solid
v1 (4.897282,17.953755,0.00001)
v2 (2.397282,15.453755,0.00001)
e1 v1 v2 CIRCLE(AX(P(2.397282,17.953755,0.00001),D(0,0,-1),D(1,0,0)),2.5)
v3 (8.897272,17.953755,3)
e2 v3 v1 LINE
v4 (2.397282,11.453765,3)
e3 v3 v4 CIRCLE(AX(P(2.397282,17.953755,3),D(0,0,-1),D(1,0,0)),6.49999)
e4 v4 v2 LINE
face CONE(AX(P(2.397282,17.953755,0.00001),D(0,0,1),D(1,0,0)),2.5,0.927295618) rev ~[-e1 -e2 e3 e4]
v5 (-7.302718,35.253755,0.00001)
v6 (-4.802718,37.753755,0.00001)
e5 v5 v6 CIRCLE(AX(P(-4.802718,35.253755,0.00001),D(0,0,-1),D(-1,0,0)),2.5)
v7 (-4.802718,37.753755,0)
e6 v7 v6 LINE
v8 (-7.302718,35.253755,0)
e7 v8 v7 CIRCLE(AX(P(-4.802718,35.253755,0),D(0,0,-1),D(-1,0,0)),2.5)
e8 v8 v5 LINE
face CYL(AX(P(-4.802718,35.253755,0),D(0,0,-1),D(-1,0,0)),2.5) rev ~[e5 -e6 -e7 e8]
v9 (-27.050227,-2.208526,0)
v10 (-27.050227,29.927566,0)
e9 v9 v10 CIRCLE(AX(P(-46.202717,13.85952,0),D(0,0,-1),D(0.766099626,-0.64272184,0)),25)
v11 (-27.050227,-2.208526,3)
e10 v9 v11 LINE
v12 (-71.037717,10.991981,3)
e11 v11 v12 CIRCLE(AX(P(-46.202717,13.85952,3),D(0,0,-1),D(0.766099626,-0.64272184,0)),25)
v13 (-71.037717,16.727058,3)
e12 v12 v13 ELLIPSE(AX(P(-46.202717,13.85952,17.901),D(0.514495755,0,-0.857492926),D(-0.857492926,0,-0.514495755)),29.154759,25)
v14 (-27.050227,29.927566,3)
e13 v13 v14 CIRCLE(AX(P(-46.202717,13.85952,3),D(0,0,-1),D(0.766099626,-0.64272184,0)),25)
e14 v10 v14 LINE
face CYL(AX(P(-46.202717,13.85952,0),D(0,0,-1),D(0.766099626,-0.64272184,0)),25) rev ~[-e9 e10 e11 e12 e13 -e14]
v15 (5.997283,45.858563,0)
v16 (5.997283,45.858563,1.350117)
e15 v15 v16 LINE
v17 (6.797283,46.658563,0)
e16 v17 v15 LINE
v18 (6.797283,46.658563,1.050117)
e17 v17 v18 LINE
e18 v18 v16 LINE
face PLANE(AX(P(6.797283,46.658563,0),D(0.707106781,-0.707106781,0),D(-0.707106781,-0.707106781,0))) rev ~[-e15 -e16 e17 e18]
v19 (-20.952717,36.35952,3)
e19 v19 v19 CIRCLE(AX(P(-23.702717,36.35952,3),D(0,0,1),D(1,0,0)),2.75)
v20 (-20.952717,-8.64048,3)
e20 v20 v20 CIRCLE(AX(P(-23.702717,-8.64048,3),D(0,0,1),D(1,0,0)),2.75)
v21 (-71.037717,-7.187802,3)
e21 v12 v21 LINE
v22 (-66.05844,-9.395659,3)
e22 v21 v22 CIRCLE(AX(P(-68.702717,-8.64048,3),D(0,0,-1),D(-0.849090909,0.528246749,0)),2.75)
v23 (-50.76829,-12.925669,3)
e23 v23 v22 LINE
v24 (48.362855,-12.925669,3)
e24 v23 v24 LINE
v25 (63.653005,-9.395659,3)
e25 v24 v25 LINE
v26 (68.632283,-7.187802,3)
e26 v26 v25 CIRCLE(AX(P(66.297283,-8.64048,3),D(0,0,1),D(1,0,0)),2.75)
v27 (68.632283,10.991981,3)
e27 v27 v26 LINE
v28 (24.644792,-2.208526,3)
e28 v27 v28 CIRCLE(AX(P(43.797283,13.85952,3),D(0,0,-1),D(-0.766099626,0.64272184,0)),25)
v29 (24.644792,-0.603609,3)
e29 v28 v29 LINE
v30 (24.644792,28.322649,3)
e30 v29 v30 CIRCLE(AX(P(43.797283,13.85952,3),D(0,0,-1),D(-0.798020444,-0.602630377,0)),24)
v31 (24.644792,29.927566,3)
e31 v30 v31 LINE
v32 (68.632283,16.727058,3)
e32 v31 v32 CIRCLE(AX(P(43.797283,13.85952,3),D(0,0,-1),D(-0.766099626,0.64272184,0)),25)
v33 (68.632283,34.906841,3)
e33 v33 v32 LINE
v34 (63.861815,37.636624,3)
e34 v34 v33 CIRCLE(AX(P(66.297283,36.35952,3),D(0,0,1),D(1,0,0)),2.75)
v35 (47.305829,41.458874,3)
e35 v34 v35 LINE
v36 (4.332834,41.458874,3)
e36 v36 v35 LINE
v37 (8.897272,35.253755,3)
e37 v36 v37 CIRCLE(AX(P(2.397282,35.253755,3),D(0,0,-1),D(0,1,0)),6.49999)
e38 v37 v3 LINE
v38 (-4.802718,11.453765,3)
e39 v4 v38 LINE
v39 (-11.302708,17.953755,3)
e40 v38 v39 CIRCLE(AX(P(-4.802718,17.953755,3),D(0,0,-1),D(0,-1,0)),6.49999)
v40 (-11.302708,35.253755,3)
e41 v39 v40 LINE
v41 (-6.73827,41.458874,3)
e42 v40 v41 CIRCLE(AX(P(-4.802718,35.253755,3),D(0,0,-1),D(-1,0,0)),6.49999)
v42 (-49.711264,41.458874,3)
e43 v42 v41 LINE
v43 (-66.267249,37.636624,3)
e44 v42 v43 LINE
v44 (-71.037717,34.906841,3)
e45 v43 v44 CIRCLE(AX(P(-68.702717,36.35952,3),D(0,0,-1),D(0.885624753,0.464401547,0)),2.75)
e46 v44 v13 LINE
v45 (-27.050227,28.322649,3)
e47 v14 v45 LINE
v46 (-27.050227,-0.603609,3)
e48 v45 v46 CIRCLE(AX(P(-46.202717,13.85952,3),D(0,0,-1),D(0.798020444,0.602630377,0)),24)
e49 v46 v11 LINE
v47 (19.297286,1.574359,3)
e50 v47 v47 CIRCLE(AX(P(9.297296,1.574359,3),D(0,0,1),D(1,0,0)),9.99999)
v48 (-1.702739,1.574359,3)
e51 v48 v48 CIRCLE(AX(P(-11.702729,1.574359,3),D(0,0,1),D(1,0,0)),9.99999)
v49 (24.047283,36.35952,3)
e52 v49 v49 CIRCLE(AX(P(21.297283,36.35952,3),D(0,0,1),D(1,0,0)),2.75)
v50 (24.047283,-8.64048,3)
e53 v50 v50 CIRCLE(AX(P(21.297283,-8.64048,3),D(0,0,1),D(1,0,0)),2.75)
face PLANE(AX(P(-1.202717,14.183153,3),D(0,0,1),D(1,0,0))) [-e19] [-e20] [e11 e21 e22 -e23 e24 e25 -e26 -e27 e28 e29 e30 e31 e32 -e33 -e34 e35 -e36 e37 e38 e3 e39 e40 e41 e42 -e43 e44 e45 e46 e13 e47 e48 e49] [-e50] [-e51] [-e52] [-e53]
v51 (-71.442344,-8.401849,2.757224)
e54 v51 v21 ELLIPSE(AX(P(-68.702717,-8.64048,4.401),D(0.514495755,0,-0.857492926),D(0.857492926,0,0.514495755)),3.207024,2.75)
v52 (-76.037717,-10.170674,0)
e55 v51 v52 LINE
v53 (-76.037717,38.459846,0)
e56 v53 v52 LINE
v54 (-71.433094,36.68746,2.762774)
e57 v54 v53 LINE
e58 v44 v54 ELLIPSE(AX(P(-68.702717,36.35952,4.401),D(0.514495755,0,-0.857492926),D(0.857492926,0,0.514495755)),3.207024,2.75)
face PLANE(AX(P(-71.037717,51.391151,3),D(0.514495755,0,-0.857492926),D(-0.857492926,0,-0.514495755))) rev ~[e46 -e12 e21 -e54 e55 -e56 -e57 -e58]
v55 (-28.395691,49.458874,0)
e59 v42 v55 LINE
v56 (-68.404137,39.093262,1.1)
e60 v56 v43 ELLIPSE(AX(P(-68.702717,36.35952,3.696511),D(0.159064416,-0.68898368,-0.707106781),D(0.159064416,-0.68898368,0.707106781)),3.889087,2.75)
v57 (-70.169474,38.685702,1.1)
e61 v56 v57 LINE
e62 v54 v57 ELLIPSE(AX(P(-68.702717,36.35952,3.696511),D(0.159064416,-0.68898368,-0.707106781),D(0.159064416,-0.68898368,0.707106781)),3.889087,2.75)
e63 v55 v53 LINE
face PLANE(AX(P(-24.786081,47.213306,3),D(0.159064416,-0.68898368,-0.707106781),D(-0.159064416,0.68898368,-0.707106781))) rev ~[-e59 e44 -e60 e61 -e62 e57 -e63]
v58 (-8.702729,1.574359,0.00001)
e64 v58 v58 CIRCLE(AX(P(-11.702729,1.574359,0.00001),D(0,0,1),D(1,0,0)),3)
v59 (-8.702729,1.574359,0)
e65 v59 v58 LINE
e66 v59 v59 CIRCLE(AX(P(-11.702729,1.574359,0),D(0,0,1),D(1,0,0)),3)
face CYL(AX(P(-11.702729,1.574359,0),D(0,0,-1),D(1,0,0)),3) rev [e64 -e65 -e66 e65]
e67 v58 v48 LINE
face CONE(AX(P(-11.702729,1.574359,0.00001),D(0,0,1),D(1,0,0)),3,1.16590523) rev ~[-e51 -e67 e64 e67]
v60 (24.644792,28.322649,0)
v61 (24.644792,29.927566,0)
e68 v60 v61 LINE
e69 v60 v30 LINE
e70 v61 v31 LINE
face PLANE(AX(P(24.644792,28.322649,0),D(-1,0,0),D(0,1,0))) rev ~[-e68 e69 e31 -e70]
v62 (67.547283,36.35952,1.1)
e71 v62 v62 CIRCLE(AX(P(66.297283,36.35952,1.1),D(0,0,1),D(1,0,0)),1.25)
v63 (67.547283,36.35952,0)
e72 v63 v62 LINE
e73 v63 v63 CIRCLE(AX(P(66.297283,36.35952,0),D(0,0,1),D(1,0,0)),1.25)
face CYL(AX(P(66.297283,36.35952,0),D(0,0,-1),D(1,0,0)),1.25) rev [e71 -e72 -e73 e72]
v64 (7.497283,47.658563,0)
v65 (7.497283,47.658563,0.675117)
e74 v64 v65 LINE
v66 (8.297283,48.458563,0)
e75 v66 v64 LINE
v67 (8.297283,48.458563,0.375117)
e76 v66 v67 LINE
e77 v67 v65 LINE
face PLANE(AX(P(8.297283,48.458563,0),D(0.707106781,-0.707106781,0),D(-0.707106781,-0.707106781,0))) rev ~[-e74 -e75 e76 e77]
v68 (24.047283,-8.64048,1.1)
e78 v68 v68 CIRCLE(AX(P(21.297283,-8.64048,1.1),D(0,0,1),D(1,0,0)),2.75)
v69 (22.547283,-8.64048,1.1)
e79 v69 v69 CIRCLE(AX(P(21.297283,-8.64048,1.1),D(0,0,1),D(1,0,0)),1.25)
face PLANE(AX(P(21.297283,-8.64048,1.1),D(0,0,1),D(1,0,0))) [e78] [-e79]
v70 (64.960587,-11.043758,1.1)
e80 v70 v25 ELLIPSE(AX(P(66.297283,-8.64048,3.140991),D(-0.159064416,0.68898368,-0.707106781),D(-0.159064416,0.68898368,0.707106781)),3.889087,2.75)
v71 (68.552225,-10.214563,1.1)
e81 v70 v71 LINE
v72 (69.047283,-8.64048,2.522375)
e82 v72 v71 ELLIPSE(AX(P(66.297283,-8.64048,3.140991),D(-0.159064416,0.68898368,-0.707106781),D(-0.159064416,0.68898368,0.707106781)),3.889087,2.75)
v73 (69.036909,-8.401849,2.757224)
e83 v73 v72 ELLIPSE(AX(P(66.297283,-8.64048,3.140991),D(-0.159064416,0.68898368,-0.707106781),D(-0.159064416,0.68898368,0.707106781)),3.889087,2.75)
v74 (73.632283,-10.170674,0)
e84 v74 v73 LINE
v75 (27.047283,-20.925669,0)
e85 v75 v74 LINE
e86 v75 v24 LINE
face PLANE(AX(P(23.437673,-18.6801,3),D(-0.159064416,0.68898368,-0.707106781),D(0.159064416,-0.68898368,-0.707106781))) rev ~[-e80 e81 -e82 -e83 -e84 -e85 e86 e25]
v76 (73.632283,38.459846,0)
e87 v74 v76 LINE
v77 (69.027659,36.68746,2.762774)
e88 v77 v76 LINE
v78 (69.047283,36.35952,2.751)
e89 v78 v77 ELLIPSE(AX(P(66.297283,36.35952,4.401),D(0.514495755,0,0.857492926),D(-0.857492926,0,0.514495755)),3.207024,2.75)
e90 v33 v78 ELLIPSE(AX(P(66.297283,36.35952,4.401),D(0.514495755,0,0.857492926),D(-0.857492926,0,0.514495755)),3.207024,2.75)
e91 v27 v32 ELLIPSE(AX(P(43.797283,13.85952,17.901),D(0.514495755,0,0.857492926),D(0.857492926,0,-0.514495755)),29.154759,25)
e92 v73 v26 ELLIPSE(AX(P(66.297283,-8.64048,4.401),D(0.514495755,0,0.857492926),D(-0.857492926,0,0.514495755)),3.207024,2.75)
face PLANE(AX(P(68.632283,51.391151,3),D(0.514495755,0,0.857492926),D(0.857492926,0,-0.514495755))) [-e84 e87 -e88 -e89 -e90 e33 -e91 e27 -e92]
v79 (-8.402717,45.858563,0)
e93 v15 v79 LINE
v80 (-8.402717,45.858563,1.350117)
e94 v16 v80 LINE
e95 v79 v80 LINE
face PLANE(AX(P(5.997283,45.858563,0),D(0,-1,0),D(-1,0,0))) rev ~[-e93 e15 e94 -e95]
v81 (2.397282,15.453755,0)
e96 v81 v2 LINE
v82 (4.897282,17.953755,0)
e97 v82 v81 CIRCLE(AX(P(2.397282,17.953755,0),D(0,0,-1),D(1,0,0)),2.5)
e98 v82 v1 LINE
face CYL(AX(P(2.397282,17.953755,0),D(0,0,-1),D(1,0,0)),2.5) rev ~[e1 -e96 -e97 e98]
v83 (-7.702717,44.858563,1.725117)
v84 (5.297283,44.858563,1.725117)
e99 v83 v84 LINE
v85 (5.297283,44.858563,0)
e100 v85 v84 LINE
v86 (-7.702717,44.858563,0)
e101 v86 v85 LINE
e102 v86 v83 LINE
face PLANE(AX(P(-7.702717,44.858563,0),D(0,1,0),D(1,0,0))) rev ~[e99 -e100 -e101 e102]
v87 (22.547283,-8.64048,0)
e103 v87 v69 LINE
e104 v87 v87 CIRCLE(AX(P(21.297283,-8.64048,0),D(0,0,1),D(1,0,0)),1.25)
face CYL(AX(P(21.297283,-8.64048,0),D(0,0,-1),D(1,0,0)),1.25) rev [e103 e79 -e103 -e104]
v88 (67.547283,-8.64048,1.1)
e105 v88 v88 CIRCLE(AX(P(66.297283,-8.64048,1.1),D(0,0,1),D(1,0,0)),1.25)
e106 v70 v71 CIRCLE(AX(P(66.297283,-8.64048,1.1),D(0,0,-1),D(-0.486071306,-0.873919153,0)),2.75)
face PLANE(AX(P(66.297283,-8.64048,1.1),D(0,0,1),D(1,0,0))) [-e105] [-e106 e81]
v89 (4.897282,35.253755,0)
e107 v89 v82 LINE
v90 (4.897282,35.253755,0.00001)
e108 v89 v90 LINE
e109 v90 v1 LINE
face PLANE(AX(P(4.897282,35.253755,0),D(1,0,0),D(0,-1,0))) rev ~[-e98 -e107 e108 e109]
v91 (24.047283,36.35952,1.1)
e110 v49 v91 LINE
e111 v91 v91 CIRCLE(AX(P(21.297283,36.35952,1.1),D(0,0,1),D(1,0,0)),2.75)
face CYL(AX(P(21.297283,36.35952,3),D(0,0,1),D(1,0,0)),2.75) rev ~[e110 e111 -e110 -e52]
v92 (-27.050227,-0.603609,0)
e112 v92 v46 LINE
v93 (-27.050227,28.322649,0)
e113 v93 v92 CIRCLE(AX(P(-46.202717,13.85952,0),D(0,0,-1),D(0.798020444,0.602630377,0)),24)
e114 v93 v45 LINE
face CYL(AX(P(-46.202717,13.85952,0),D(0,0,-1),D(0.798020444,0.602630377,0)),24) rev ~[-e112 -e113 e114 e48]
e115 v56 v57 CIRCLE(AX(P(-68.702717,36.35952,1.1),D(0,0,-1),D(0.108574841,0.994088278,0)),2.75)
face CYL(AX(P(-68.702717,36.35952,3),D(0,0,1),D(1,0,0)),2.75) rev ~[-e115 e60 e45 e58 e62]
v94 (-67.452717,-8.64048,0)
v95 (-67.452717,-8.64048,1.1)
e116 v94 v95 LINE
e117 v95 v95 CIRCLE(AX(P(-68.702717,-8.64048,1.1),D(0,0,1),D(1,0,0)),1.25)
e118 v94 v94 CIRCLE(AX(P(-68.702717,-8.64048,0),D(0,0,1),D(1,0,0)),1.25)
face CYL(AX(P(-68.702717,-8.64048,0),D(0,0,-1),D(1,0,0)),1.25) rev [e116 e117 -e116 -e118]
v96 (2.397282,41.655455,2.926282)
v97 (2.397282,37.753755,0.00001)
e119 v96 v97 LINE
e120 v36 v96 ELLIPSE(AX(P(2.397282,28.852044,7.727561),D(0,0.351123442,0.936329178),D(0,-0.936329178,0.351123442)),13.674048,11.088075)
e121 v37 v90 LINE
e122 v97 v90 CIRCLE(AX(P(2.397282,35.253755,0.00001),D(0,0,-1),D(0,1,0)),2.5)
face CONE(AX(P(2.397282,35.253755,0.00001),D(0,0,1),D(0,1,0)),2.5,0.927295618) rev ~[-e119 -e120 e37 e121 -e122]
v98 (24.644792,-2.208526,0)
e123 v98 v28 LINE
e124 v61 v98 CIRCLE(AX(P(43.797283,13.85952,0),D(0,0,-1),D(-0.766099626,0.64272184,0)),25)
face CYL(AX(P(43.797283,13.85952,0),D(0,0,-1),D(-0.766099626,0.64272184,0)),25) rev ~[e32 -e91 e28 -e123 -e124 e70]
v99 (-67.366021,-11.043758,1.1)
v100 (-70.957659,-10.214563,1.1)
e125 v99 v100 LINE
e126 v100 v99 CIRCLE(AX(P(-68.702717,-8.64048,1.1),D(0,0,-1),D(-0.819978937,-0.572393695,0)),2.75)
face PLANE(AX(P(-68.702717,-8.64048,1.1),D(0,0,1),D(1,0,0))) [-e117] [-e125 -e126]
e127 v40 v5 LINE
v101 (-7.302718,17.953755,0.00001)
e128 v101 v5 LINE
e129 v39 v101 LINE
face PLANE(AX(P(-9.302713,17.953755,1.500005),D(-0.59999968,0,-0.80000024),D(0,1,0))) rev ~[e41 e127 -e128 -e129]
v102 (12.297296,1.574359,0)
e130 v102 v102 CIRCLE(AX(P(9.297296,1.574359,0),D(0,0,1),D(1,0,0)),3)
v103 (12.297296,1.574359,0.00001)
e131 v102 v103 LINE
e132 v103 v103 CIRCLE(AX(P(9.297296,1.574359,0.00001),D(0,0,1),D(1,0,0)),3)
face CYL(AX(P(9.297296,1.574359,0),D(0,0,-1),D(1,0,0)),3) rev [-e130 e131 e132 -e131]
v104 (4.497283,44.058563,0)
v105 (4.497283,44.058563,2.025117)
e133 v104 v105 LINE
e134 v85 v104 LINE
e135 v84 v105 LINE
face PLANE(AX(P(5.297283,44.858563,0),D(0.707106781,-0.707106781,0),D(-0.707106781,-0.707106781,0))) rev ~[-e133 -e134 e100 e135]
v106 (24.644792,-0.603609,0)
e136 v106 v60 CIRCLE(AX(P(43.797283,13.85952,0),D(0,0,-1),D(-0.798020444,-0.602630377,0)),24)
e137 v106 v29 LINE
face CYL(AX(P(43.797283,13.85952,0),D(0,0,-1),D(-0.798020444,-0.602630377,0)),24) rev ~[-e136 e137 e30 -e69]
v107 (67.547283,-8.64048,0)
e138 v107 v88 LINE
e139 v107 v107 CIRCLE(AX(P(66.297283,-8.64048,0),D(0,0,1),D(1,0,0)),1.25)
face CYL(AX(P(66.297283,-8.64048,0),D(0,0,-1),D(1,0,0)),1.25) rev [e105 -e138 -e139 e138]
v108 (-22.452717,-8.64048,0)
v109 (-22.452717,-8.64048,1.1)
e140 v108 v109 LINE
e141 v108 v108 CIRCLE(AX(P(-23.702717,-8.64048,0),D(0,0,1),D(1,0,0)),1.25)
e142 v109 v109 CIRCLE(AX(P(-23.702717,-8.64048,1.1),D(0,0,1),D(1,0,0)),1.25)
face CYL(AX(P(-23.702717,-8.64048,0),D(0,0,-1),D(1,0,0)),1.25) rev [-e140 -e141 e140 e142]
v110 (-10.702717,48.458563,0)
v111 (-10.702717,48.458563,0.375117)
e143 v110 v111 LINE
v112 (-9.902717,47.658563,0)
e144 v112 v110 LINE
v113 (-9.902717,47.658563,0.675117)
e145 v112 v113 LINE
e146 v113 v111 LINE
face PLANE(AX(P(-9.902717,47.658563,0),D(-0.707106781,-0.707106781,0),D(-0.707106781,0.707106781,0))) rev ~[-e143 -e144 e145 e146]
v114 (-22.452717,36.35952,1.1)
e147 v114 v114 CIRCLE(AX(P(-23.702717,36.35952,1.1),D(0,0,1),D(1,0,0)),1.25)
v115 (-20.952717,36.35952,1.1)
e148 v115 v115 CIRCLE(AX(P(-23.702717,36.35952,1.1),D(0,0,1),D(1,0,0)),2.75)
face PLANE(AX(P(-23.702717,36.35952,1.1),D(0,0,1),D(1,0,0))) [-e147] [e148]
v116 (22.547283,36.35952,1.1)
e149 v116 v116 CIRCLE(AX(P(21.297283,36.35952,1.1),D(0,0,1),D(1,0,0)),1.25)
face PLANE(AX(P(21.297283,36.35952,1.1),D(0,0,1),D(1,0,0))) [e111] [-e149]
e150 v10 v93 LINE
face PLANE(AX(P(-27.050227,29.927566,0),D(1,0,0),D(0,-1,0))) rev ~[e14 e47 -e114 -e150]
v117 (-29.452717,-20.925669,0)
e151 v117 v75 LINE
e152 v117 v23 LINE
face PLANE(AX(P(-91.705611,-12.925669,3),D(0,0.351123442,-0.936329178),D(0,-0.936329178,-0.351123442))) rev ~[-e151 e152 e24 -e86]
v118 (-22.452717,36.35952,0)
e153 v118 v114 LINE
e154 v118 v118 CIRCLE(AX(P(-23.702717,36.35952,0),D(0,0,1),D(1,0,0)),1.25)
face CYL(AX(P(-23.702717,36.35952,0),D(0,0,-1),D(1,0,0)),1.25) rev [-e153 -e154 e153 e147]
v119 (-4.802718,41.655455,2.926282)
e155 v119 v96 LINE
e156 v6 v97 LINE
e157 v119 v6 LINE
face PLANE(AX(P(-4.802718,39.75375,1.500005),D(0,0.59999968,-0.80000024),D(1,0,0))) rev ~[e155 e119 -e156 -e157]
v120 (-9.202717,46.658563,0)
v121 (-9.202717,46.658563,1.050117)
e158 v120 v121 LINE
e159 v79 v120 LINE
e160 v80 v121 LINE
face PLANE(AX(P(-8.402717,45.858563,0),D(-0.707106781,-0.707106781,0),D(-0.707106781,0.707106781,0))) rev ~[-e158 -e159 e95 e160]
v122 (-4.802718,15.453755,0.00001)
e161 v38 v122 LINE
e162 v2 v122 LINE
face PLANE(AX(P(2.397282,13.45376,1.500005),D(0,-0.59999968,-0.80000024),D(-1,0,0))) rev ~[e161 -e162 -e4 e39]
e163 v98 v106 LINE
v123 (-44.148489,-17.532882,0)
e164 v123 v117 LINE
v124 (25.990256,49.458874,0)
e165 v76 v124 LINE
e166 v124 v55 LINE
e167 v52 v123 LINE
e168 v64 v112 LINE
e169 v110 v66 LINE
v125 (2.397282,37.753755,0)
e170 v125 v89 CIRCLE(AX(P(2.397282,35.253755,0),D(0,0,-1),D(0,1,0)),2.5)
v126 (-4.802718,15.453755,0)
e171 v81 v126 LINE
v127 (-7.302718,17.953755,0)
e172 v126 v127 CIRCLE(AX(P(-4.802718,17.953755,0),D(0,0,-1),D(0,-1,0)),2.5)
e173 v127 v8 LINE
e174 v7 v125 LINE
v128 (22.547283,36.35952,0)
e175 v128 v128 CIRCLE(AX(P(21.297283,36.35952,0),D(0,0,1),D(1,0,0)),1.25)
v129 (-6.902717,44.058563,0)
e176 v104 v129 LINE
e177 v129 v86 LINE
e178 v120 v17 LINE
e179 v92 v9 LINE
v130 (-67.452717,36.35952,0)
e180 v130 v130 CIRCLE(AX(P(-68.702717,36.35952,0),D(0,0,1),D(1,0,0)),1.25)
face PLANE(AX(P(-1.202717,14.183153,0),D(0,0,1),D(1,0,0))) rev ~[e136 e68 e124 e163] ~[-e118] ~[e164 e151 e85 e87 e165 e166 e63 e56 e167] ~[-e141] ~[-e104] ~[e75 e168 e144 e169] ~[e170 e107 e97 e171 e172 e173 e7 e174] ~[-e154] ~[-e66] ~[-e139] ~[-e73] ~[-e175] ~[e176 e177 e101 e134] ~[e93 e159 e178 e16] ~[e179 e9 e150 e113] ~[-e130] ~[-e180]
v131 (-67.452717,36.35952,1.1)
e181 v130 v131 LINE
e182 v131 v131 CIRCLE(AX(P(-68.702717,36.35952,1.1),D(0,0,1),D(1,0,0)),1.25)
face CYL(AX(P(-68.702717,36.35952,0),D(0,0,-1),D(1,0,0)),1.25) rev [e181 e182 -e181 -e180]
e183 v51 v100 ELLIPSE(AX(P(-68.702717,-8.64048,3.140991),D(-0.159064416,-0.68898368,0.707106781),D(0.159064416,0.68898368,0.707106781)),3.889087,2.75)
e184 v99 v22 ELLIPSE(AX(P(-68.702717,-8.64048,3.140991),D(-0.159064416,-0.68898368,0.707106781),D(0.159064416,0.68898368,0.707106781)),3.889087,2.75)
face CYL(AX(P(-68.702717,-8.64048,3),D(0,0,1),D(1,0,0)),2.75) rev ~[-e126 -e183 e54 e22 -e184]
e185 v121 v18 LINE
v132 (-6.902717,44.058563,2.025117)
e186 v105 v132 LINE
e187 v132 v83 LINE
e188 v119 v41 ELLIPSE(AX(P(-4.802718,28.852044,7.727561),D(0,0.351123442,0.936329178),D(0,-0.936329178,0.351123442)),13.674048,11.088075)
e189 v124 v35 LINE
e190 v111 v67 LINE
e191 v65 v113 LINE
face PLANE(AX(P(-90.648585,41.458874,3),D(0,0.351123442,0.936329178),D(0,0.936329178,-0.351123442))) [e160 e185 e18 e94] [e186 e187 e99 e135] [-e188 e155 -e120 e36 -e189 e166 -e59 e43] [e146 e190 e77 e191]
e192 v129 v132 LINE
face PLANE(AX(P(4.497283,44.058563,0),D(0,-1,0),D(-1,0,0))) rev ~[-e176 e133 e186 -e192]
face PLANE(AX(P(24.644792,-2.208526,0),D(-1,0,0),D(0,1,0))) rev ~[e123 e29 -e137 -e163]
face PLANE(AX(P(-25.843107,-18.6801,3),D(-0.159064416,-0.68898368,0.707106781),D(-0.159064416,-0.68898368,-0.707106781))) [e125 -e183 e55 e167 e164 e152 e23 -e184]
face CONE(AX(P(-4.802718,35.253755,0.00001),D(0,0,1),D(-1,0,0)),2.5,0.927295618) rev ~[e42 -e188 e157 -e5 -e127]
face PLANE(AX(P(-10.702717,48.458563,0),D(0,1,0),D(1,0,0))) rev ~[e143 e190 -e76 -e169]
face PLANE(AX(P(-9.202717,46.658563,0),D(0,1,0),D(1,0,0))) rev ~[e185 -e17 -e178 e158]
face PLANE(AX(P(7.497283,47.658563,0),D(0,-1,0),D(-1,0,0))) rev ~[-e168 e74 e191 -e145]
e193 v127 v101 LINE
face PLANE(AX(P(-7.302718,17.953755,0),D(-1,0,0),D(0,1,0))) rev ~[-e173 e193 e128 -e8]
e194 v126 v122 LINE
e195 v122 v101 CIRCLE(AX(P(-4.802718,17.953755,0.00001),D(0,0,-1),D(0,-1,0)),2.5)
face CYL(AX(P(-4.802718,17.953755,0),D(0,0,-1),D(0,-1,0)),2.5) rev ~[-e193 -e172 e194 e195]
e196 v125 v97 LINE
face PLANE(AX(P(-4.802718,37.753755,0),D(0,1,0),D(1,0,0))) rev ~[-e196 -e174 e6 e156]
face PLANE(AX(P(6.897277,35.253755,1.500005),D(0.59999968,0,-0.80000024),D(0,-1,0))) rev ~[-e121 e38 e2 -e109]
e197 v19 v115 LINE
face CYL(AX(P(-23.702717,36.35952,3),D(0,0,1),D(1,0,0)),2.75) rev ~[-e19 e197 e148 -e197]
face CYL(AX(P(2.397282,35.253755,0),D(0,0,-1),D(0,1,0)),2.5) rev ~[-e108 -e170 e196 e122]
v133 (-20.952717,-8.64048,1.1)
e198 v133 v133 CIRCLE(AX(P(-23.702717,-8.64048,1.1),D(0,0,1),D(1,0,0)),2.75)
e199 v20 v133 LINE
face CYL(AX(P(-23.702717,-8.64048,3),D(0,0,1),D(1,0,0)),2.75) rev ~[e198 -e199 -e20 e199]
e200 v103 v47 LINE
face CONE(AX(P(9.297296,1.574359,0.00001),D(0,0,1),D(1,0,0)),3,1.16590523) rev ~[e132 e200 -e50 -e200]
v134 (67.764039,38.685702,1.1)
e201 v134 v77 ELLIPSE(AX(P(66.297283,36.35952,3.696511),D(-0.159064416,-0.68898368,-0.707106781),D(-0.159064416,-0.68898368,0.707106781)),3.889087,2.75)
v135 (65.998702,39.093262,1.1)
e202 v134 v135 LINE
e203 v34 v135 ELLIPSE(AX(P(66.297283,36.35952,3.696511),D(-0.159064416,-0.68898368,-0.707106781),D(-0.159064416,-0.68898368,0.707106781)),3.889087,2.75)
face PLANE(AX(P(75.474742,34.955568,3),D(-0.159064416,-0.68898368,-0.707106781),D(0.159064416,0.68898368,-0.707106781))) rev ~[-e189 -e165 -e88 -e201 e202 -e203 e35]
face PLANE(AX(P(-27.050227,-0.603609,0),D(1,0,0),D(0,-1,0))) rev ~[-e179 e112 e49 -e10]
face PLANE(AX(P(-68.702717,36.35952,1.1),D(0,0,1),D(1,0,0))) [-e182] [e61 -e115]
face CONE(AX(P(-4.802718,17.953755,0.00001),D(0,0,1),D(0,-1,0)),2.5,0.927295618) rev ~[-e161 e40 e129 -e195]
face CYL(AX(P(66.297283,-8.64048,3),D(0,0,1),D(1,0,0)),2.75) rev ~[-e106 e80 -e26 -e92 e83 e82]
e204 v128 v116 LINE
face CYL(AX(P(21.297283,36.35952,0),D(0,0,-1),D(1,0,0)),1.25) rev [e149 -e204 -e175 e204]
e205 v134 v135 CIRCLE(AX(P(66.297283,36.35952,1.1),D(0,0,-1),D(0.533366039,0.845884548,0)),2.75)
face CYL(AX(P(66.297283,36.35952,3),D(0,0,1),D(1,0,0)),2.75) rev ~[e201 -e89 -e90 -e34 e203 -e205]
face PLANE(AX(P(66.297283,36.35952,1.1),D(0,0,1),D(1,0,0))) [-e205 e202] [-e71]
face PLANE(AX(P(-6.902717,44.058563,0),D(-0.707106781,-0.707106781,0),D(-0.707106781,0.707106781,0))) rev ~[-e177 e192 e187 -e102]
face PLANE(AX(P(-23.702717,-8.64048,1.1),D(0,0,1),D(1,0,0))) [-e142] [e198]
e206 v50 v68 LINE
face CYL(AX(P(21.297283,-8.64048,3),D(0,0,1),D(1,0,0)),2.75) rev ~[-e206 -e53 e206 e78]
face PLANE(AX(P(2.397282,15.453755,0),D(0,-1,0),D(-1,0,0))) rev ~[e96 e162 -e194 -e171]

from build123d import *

# Parameters (mm, degrees)
F0_R        = 1.25
F0_R_2      = 3
F1_DEPTH    = 3
F2_SIZE2    = 6.99999
F2_SIZE     = 2.99999
F2_2_SIZE2  = 6.99999
F2_2_SIZE   = 2.99999
F3_SIZE2    = 2.99999
F3_SIZE     = 3.99999
F4_T1_DEPTH = 178.8917354422
F4_T3_DEPTH = 181.0057878677
F5_T1_DEPTH = 74.4931306538
F6_T1_DEPTH = 53.4058582454
F6_T3_DEPTH = 54.4906885897
F6_T5_DEPTH = 53.4058582454
F6_T7_DEPTH = 54.4906885841
F7_R        = 2.75
F7_R_2      = 1.25
F8_DEPTH    = 1.9


# Not quite as in the source:
# - a fillet or chamfer that OpenCascade refuses, or shapes differently, is made with other operations: its cross-section is extruded or revolved along the edge and cut away or added
# - a fillet or chamfer is up to 0.001 mm smaller than in the source, because OpenCascade refuses the exact size


with BuildPart() as f1:
    # F0 (on Top) → F1 (new body)
    with BuildSketch(Plane.XY):
        Polygon((-44.1484891925, -17.5328822659), (-29.4527173684, -20.9256685242), (27.0472826316, -20.9256685242), (73.6322826316, -10.1706738406), (73.6322826316, 38.4598458413), (25.9902564184, 49.4588742547), (-28.3956911556, 49.4588742546), (-76.037717368, 38.4598458414), (-76.0377173684, -10.1706738406), align=None)
        with Locations((-68.7027173684, -8.6404804453)):
            Circle(F0_R, mode=Mode.SUBTRACT)
        with Locations((-23.7027173684, -8.6404804453)):
            Circle(F0_R, mode=Mode.SUBTRACT)
        with BuildLine():
            ThreePointArc((-27.0502267204, -2.2085264366), (-71.2027173684, 13.8595195547), (-27.0502267204, 29.927565546))
            Line((-27.0502267204, 29.927565546), (-27.0502267204, 28.3226486068))
            ThreePointArc((-27.0502267204, 28.3226486068), (-22.2027173684, 13.8595195547), (-27.0502267204, -0.6036094974))
            Line((-27.0502267204, -0.6036094974), (-27.0502267204, -2.2085264366))
        make_face(mode=Mode.SUBTRACT)
        with Locations((-11.7027286338, 1.5743587088)):
            Circle(F0_R_2, mode=Mode.SUBTRACT)
        with Locations((21.2972826316, -8.6404804453)):
            Circle(F0_R, mode=Mode.SUBTRACT)
        with Locations((66.2972826316, -8.6404804453)):
            Circle(F0_R, mode=Mode.SUBTRACT)
        with Locations((9.2972956984, 1.5743587088)):
            Circle(F0_R_2, mode=Mode.SUBTRACT)
        with BuildLine():
            ThreePointArc((24.6447919836, 29.927565546), (68.7972826316, 13.8595195547), (24.6447919836, -2.2085264366))
            Line((24.6447919836, -2.2085264366), (24.6447919836, -0.6036094974))
            ThreePointArc((24.6447919836, -0.6036094974), (19.7972826316, 13.8595195547), (24.6447919836, 28.3226486068))
            Line((24.6447919836, 28.3226486068), (24.6447919836, 29.927565546))
        make_face(mode=Mode.SUBTRACT)
        with BuildLine():
            Line((4.8972822306, 35.2537547127), (4.8972822306, 17.9537547127))
            ThreePointArc((4.8972822306, 17.9537547127), (4.1650491836, 16.1859877597), (2.3972822306, 15.4537547127))
            Line((2.3972822306, 15.4537547127), (-4.8027177694, 15.4537547127))
            ThreePointArc((-4.8027177694, 15.4537547127), (-6.5704847223, 16.1859877597), (-7.3027177694, 17.9537547127))
            Line((-7.3027177694, 17.9537547127), (-7.3027177694, 35.2537547127))
            ThreePointArc((-7.3027177694, 35.2537547127), (-6.5704847223, 37.0215216656), (-4.8027177694, 37.7537547127))
            Line((-4.8027177694, 37.7537547127), (2.3972822306, 37.7537547127))
            ThreePointArc((2.3972822306, 37.7537547127), (4.1650491836, 37.0215216656), (4.8972822306, 35.2537547127))
        make_face(mode=Mode.SUBTRACT)
        with Locations((-68.7027173684, 36.3595195547)):
            Circle(F0_R, mode=Mode.SUBTRACT)
        with Locations((-23.7027173684, 36.3595195547)):
            Circle(F0_R, mode=Mode.SUBTRACT)
        Polygon((-7.7027173684, 44.858563391), (5.2972826316, 44.858563391), (4.4972826316, 44.058563391), (-6.9027173684, 44.058563391), align=None, mode=Mode.SUBTRACT)
        Polygon((-9.2027173684, 46.658563391), (6.7972826316, 46.658563391), (5.9972826316, 45.858563391), (-8.4027173684, 45.858563391), align=None, mode=Mode.SUBTRACT)
        Polygon((-10.7027173684, 48.458563391), (8.2972826316, 48.458563391), (7.4972826316, 47.658563391), (-9.9027173684, 47.658563391), align=None, mode=Mode.SUBTRACT)
        with Locations((21.2972826316, 36.3595195547)):
            Circle(F0_R, mode=Mode.SUBTRACT)
        with Locations((66.2972826316, 36.3595195547)):
            Circle(F0_R, mode=Mode.SUBTRACT)
    extrude(amount=F1_DEPTH)

    # F2 (size 3 and 7 in the source; OpenCascade refuses exactly that, so slightly less here)
    f2_edges = [f1.edges().sort_by_distance(p)[0] for p in [
        (6.297296, 1.574359, 3),
    ]]
    f2_side = f1.faces().sort_by_distance((6.297296, 1.574359, 1.5))[0]
    chamfer(f2_edges, length=F2_SIZE, length2=F2_SIZE2, reference=f2_side)

    # F2#2 (size 3 and 7 in the source; OpenCascade refuses exactly that, so slightly less here)
    f2_2_edges = [f1.edges().sort_by_distance(p)[0] for p in [
        (-14.702729, 1.574359, 3),
    ]]
    f2_2_side = f1.faces().sort_by_distance((-14.702729, 1.574359, 1.5))[0]
    chamfer(f2_2_edges, length=F2_2_SIZE, length2=F2_2_SIZE2, reference=f2_2_side)

    # F3 (size 4 and 3 in the source; OpenCascade refuses exactly that, so slightly less here)
    f3_edges = [f1.edges().sort_by_distance(p)[0] for p in [
        (-1.202718, 37.753755, 3),
        (-7.302718, 26.603755, 3),
        (-1.202718, 15.453755, 3),
        (-6.570485, 16.185988, 3),
        (4.165049, 16.185988, 3),
        (4.897282, 26.603755, 3),
        (4.165049, 37.021522, 3),
        (-6.570485, 37.021522, 3),
    ]]
    f3_side = f1.faces().sort_by_distance((-1.202717, 15.209837, 3))[0]
    chamfer(f3_edges, length=F3_SIZE, length2=F3_SIZE2, reference=f3_side)

    # F4: chamfer of 3 x 8 on 2 edges, made by hand

    # F4_s2 → F4_t1 (cut)
    with BuildSketch(Plane.YZ.offset(-90.6485850894)):
        Polygon((41.4588742546, 3), (49.4588742546, 0), (49.4588742546, 3), align=None)
    extrude(amount=F4_T1_DEPTH, mode=Mode.SUBTRACT)

    # F4_s4 → F4_t3 (cut)
    with BuildSketch(Plane.YZ.offset(-91.7056113022)):
        Polygon((-12.9256685242, 3), (-20.9256685242, 0), (-20.9256685242, 3), align=None)
    extrude(amount=F4_T3_DEPTH, mode=Mode.SUBTRACT)

    # F5: chamfer of 5 x 3 on 2 edges, made by hand

    # F5_s2 → F5_t1 (cut)
    with BuildSketch(Plane.XZ.offset(-51.3911513272)):
        Polygon((-71.0377173684, 3), (-76.0377173684, 0), (-76.0377173684, 3), align=None)
        Polygon((68.6322826316, 3), (73.6322826316, 0), (73.6322826316, 3), align=None)
    extrude(amount=F5_T1_DEPTH, mode=Mode.SUBTRACT)

    # F6: chamfer of 3 on 4 edges, made by hand

    # F6_s2 → F6_t1 (cut)
    with BuildSketch(Plane(origin=(-20.4409607394, 4.7191676308, 0), x_dir=(0, 0, 1), z_dir=(-0.9743700648, 0.2249510543, 0))):
        Polygon((3, -24.0147648209), (0, -27.0147648209), (3, -27.0147648209), align=None)
    extrude(amount=F6_T1_DEPTH, mode=Mode.SUBTRACT)

    # F6_s4 → F6_t3 (cut)
    with BuildSketch(Plane(origin=(-13.1833561407, -3.0436175852, 0), x_dir=(0, 0, 1), z_dir=(-0.9743700648, -0.2249510543, 0))):
        Polygon((3, 51.5788871759), (0, 54.5788871759), (3, 54.5788871759), align=None)
    extrude(amount=F6_T3_DEPTH, mode=Mode.SUBTRACT)

    # F6_s6 → F6_t5 (cut)
    with BuildSketch(Plane(origin=(18.1572481609, 4.1919310387, 0), x_dir=(0, 0, 1), z_dir=(0.9743700648, 0.2249510543, 0))):
        Polygon((3, 23.4736597407), (0, 26.4736597407), (3, 26.4736597407), align=None)
    extrude(amount=F6_T5_DEPTH, mode=Mode.SUBTRACT)

    # F6_s8 → F6_t7 (cut)
    with BuildSketch(Plane(origin=(63.9937393355, -14.7741188415, 0), x_dir=(0, 0, 1), z_dir=(-0.9743700648, 0.2249510543, 0))):
        Polygon((3, 51.0377820952), (0, 54.0377820952), (3, 54.0377820952), align=None)
    extrude(amount=F6_T7_DEPTH, mode=Mode.SUBTRACT)

    # F7 (on face) → F8 (cut)
    with BuildSketch(Plane.XY.offset(3)):
        with Locations((-68.7027173684, 36.3595195547)):
            Circle(F7_R)
        with Locations((-68.7027173684, 36.3595195547)):
            Circle(F7_R_2, mode=Mode.SUBTRACT)
        with Locations((-23.7027173684, 36.3595195547)):
            Circle(F7_R)
        with Locations((-23.7027173684, 36.3595195547)):
            Circle(F7_R_2, mode=Mode.SUBTRACT)
        with Locations((21.2972826316, 36.3595195547)):
            Circle(F7_R)
        with Locations((21.2972826316, 36.3595195547)):
            Circle(F7_R_2, mode=Mode.SUBTRACT)
        with Locations((66.2972826316, 36.3595195547)):
            Circle(F7_R)
        with Locations((66.2972826316, 36.3595195547)):
            Circle(F7_R_2, mode=Mode.SUBTRACT)
        with Locations((66.2972826316, -8.6404804453)):
            Circle(F7_R)
        with Locations((66.2972826316, -8.6404804453)):
            Circle(F7_R_2, mode=Mode.SUBTRACT)
        with Locations((21.2972826316, -8.6404804453)):
            Circle(F7_R)
        with Locations((21.2972826316, -8.6404804453)):
            Circle(F7_R_2, mode=Mode.SUBTRACT)
        with Locations((-23.7027173684, -8.6404804453)):
            Circle(F7_R)
        with Locations((-23.7027173684, -8.6404804453)):
            Circle(F7_R_2, mode=Mode.SUBTRACT)
        with Locations((-68.7027173684, -8.6404804453)):
            Circle(F7_R)
        with Locations((-68.7027173684, -8.6404804453)):
            Circle(F7_R_2, mode=Mode.SUBTRACT)
    extrude(amount=-F8_DEPTH, mode=Mode.SUBTRACT)


solid = f1.part
